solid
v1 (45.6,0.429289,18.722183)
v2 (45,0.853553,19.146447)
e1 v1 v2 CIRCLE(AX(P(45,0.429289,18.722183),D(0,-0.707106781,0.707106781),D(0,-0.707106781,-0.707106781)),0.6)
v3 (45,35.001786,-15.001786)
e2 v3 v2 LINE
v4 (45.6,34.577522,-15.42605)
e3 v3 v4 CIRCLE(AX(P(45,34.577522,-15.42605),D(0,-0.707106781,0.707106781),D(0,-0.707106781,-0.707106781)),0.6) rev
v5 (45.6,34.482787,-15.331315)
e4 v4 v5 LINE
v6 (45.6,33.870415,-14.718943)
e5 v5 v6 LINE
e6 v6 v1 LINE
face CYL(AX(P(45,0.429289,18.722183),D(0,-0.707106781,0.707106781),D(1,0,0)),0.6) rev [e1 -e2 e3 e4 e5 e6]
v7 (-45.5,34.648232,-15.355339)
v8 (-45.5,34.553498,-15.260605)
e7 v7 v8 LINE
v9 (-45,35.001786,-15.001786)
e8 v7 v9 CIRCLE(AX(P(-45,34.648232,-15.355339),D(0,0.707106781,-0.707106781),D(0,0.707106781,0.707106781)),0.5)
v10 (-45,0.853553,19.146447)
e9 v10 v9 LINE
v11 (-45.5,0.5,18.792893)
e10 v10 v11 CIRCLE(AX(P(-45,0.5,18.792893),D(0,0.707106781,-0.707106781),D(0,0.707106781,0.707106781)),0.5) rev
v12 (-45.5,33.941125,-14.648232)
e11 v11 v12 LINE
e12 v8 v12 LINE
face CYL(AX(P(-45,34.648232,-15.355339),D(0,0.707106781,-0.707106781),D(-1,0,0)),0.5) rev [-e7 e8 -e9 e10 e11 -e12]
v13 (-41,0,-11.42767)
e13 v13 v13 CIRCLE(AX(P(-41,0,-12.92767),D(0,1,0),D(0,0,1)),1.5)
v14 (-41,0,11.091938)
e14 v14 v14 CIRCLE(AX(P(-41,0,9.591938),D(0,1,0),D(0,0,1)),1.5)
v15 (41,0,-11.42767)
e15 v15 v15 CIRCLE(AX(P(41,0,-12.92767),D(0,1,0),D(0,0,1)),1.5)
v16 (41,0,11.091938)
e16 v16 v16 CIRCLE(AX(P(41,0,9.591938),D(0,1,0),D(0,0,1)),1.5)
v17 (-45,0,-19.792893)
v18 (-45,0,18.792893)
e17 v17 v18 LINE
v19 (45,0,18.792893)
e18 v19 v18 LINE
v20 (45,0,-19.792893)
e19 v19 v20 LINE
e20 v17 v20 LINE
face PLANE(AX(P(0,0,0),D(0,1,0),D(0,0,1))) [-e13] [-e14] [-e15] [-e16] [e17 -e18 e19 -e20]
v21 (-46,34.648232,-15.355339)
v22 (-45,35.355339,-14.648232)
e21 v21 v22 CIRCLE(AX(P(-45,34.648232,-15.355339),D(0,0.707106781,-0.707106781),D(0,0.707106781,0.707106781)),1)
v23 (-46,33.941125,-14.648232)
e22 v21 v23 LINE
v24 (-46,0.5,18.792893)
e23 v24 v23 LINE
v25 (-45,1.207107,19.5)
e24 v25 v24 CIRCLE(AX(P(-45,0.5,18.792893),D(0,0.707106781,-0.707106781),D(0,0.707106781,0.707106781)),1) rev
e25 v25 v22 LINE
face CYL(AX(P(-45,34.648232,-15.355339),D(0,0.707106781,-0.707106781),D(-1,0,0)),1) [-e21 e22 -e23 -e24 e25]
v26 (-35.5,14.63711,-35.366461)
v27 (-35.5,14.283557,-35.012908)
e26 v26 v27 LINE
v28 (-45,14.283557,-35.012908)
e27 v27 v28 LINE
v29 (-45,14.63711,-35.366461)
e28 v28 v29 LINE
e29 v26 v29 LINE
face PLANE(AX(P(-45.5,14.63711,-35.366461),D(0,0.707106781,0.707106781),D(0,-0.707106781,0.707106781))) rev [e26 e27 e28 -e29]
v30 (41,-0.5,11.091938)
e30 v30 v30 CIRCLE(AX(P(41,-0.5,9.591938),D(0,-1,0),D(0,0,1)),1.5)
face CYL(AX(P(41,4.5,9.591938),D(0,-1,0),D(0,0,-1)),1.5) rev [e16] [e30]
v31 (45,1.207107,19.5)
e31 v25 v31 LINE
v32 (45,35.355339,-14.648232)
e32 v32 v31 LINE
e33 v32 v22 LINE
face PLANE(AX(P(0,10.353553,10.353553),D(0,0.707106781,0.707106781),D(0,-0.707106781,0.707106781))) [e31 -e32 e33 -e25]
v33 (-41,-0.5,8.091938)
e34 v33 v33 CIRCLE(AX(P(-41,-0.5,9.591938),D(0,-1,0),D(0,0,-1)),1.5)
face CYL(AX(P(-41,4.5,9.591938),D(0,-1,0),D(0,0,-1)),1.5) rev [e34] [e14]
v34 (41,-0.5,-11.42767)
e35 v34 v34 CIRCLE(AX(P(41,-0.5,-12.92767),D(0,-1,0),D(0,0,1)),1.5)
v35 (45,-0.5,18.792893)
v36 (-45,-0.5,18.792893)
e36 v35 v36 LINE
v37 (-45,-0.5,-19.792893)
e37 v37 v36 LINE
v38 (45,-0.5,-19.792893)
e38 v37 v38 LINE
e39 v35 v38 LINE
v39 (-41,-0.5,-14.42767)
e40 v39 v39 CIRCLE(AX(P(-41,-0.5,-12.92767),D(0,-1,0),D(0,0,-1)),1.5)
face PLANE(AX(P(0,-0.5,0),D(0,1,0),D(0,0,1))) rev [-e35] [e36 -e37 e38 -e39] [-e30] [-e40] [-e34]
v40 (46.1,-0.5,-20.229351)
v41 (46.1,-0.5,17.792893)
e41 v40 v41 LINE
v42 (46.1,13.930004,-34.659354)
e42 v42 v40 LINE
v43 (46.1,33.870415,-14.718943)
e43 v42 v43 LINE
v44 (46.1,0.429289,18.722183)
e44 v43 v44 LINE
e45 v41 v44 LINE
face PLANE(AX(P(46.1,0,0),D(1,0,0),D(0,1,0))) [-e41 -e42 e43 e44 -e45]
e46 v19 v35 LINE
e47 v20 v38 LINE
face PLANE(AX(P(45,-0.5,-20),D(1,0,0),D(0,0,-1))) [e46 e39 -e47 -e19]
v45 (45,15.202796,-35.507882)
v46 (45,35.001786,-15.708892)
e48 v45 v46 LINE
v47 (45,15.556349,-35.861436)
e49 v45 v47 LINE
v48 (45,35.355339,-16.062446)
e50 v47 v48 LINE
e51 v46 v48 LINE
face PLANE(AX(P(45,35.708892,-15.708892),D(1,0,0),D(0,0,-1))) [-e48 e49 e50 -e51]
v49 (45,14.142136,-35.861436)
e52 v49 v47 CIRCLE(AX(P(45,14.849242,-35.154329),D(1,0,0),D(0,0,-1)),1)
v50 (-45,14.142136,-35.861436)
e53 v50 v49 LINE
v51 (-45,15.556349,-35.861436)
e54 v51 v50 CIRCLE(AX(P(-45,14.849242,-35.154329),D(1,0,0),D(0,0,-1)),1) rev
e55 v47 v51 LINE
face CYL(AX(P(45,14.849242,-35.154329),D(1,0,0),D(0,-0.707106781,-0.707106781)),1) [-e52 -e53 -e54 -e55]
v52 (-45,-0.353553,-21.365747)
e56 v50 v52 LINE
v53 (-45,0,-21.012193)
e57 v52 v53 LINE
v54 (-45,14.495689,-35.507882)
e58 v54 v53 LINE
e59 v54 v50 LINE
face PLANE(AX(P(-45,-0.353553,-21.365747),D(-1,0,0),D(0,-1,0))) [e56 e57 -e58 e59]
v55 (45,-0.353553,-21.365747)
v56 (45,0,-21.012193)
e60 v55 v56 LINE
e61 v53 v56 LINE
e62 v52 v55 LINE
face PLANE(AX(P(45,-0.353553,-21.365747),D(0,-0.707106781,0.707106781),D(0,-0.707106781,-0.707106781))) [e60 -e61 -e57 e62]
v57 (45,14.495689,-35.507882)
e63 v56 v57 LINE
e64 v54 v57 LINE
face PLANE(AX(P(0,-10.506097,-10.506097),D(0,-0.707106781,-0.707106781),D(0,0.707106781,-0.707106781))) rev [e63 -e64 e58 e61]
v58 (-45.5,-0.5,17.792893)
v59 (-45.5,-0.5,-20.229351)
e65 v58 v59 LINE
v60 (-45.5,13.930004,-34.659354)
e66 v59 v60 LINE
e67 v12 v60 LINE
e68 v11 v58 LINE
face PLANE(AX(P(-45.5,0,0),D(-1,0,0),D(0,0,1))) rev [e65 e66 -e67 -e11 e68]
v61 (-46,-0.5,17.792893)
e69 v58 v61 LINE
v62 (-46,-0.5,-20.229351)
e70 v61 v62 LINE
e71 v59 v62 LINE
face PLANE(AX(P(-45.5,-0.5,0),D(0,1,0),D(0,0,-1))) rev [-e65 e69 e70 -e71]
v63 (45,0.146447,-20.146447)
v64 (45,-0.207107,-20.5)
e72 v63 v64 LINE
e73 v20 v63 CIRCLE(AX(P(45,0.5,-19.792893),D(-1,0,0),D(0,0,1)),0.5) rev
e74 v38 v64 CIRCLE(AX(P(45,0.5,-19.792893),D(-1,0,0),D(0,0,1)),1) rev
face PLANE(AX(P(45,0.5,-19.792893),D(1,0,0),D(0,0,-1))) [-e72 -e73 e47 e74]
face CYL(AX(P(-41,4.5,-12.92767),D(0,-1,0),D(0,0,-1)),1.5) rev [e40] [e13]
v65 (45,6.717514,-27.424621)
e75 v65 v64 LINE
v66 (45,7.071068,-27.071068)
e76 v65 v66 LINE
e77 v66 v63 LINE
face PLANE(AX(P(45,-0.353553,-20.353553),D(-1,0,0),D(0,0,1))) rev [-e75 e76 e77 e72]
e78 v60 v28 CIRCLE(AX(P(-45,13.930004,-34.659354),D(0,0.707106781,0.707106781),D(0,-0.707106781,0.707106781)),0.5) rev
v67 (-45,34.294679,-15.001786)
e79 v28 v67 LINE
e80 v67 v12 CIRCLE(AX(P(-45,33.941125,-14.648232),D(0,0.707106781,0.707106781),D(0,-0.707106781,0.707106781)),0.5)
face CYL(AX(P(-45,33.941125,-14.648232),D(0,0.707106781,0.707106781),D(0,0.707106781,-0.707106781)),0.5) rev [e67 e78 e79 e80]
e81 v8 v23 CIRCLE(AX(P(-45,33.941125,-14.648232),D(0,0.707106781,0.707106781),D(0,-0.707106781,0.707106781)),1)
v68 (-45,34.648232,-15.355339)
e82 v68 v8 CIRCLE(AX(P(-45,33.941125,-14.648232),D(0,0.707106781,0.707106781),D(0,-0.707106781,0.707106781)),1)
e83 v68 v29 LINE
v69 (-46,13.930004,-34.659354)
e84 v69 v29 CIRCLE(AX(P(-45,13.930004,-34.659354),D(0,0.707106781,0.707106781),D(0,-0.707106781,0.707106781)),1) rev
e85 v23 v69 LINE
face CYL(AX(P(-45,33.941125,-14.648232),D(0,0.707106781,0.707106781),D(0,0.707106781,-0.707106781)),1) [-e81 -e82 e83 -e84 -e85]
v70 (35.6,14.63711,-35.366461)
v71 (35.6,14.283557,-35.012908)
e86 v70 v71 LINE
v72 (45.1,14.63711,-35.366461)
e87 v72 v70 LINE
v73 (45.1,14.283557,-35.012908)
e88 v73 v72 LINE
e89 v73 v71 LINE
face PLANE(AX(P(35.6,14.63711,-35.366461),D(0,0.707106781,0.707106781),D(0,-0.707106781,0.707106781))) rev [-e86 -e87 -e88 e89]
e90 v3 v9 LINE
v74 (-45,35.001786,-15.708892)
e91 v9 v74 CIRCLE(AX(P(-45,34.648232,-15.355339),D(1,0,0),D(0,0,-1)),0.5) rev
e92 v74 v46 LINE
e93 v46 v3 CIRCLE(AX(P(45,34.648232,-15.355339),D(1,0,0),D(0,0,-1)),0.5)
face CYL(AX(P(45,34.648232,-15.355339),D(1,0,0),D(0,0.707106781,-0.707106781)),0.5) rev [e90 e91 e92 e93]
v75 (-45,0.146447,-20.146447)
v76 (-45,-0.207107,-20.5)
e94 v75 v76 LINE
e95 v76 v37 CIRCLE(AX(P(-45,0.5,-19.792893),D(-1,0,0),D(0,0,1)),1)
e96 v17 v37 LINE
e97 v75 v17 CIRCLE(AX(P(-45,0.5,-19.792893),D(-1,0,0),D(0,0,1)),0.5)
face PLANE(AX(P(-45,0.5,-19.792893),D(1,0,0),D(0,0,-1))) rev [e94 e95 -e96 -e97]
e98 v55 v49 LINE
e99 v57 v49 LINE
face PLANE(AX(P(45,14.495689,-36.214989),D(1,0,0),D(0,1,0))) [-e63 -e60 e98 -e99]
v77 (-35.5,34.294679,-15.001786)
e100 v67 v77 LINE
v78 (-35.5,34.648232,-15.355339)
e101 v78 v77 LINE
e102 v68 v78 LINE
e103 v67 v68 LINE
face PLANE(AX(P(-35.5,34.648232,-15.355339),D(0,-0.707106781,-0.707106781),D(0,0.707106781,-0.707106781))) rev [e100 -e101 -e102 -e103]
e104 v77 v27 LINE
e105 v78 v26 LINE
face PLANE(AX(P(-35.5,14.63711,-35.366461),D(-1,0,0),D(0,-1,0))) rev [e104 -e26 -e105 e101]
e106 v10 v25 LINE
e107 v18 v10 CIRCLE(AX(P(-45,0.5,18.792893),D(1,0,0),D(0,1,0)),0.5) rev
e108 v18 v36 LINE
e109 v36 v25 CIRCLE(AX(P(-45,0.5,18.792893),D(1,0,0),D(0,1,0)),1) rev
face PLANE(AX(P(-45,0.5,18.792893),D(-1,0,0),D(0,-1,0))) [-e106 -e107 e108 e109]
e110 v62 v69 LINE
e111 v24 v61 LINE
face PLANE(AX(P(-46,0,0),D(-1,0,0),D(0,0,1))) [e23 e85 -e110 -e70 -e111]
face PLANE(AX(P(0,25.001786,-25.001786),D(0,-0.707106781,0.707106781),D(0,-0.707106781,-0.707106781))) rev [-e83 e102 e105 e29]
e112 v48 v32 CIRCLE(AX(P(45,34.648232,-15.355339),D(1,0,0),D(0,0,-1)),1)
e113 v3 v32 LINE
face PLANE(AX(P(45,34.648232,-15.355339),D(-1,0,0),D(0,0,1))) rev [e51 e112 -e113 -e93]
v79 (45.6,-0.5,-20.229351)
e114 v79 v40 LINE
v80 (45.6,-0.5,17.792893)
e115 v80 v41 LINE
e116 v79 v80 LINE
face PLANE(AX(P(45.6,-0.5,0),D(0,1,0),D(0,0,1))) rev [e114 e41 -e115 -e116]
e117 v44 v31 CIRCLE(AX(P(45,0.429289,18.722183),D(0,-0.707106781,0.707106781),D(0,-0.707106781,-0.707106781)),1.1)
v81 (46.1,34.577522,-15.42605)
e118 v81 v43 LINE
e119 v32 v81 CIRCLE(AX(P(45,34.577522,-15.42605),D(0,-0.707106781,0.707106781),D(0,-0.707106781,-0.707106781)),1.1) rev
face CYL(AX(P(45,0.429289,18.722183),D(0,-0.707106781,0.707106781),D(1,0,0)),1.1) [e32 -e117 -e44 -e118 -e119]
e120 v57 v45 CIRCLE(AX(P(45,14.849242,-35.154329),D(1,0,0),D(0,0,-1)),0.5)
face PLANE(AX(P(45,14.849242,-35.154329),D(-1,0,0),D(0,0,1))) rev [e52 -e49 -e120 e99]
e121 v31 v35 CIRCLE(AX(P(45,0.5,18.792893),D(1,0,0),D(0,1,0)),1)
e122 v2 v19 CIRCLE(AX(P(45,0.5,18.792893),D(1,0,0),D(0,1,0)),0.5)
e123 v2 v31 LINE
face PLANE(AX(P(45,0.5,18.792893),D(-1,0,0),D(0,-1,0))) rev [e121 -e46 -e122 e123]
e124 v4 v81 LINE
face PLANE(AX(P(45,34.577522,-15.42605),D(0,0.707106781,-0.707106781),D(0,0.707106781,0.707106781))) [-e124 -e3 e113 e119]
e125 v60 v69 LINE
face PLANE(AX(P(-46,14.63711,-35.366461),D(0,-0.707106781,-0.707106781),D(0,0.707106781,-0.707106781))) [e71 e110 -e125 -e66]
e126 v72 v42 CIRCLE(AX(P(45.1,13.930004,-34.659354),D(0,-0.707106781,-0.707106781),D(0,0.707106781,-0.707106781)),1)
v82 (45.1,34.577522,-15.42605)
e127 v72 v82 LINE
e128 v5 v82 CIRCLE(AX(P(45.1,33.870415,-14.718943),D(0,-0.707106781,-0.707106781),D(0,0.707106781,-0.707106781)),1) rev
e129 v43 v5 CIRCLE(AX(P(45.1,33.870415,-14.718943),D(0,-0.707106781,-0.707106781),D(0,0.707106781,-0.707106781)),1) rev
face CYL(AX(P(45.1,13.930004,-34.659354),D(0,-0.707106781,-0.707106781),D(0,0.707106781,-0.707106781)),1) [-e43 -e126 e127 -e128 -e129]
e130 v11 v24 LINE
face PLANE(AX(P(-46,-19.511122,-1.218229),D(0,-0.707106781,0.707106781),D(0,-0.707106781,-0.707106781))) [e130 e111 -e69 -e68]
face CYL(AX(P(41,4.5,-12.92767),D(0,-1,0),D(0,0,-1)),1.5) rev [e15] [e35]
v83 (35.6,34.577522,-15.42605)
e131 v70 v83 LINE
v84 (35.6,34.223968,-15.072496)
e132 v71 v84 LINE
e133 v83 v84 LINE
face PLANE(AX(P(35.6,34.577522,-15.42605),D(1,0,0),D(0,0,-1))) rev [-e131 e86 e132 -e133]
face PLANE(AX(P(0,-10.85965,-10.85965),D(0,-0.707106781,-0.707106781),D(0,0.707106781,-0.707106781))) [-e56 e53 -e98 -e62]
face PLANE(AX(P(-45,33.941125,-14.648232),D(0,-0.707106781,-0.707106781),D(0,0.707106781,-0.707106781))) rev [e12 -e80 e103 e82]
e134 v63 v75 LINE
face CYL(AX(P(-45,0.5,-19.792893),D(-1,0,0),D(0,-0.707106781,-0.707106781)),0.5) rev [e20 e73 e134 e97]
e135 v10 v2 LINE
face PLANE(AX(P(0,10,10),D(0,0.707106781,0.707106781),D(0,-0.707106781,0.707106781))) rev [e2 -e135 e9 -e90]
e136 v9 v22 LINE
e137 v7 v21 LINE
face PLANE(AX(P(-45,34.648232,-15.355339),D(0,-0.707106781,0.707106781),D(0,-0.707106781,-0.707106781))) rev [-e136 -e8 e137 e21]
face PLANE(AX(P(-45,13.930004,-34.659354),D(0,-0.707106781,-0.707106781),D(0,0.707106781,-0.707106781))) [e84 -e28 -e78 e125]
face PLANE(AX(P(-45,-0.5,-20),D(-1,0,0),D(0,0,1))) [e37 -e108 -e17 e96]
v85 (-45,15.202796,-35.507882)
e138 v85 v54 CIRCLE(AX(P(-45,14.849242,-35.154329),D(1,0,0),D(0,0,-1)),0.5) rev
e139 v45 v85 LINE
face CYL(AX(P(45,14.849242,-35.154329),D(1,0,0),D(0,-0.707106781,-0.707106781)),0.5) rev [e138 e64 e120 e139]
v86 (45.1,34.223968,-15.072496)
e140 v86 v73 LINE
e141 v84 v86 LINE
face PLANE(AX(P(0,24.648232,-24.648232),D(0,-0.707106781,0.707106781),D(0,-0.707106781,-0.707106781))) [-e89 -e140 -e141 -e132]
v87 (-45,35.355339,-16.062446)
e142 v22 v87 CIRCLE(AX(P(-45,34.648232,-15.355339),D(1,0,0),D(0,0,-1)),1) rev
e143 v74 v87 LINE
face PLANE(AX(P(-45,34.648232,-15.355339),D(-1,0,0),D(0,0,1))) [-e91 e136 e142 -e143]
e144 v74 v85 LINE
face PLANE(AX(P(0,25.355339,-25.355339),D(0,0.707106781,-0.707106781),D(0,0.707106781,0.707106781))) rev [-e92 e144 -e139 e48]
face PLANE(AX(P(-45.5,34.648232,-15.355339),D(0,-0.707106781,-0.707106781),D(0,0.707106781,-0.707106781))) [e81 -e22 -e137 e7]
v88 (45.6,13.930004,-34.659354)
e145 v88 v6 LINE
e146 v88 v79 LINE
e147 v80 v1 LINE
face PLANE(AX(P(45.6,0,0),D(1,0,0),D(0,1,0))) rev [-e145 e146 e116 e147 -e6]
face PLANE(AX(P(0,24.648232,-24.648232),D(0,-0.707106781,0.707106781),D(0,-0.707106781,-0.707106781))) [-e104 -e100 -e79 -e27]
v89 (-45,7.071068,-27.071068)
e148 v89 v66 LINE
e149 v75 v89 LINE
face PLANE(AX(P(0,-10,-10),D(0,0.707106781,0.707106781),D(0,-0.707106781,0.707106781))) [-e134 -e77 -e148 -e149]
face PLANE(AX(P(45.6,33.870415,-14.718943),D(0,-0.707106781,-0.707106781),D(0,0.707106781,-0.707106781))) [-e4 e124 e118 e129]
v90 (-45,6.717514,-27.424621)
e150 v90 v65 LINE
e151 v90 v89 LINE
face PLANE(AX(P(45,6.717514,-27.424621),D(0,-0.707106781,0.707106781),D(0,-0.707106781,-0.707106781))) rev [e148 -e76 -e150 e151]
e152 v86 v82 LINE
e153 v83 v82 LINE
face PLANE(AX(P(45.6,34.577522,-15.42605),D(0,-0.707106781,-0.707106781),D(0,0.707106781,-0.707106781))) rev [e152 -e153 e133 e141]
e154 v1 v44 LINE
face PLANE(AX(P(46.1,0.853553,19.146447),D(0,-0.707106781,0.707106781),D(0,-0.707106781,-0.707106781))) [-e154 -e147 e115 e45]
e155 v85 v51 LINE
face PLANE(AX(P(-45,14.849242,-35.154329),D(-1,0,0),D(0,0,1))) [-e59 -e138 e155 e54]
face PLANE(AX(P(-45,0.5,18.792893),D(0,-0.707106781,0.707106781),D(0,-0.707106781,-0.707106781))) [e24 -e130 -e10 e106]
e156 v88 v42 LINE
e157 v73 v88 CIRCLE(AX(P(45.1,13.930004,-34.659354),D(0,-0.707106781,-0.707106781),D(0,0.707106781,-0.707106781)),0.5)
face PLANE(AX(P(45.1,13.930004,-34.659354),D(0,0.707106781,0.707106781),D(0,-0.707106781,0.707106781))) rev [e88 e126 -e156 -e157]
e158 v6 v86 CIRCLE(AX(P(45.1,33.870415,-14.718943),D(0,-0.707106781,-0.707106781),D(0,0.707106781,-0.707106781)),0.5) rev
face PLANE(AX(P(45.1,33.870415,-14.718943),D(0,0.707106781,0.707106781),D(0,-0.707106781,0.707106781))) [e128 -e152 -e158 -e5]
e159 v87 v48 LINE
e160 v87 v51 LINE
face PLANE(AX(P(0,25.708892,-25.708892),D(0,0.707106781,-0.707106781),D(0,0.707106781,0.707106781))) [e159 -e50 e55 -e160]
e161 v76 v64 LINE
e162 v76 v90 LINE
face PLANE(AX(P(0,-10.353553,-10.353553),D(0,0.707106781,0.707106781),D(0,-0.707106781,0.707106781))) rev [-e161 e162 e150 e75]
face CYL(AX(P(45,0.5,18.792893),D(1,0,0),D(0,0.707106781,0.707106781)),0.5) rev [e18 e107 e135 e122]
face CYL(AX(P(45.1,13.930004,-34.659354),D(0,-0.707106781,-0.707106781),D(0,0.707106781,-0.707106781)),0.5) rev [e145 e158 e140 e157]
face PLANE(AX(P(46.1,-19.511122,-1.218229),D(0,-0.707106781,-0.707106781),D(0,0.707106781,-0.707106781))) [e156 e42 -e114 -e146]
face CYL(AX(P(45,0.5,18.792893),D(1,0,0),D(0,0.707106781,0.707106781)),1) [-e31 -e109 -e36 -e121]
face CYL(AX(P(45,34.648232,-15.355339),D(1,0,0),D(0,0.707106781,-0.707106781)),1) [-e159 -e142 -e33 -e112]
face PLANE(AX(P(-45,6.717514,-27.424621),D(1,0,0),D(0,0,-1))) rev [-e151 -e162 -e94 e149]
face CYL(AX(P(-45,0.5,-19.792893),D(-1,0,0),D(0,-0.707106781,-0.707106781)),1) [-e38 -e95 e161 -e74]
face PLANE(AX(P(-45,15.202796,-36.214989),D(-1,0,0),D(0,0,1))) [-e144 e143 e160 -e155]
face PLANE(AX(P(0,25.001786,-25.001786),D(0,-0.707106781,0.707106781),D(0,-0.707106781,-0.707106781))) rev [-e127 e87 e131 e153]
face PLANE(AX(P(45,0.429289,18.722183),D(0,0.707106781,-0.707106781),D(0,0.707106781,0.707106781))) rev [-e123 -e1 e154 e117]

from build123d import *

# Parameters (mm, degrees)
SKETCH1_W                     = 90
SKETCH1_H                     = 40
BASE_FLANGE1_DEPTH            = 0.5
EDGE_FLANGE1_STRIP_CUT_DEPTH  = 90
EDGE_FLANGE1_DEPTH            = 90
EDGE_FLANGE3_STRIP_CUT_DEPTH  = 90
EDGE_FLANGE3_DEPTH            = 90
EDGE_FLANGE2_STRIP_W          = 3
EDGE_FLANGE2_STRIP_H          = 0.5
EDGE_FLANGE2_STRIP_CUT_DEPTH  = 90
EDGE_FLANGE2_DEPTH            = 90
EDGE_FLANGE5_STRIP_W          = 3
EDGE_FLANGE5_STRIP_H          = 0.5
EDGE_FLANGE5_STRIP_CUT_DEPTH  = 90
EDGE_FLANGE5_DEPTH            = 90
EDGE_FLANGE7_DEPTH            = 48.292893219
EDGE_FLANGE8_DEPTH            = 48.292893219
CUT_EXTRUDE3_DEPTH            = 106.168160415
EDGE_FLANGE9_STRIP_W          = 3
EDGE_FLANGE9_STRIP_H          = 0.5
EDGE_FLANGE9_STRIP_CUT_DEPTH  = 28.3
EDGE_FLANGE9_DEPTH            = 28.3
EDGE_FLANGE10_STRIP_W         = 3
EDGE_FLANGE10_STRIP_H         = 0.5
EDGE_FLANGE10_STRIP_CUT_DEPTH = 28.2
EDGE_FLANGE10_DEPTH           = 28.2
SKETCH65_R                    = 1.5
CUT_EXTRUDE4_DEPTH            = 5


# Sheet-metal steps are written as plain solids
with BuildPart() as part:
    # Sketch1 → Base-Flange1 (new body)
    with BuildSketch(Plane(origin=(0, 0, 0), x_dir=(1, 0, 0), z_dir=(0, 1, 0))):
        Rectangle(SKETCH1_W, SKETCH1_H)
    extrude(amount=-BASE_FLANGE1_DEPTH)

    # Edge-Flange1 strip (across the edge) → Edge-Flange1 strip cut (cut)
    with BuildSketch(Plane(origin=(-45, 0, 20), x_dir=(0, -0.7071067811865513, -0.7071067811865438), z_dir=(1, 0, 0))):
        Polygon((-3.914213562, -4.621320344), (1.207106781, 0.5), (0.853553391, 0.853553391), (-4.267766953, -4.267766953), align=None)
    extrude(amount=EDGE_FLANGE1_STRIP_CUT_DEPTH, mode=Mode.SUBTRACT)

    # Edge-Flange1 section (across the edge) → Edge-Flange1 (add)
    with BuildSketch(Plane(origin=(-45, 0, 20), x_dir=(0, -0.7071067811865513, -0.7071067811865438), z_dir=(1, 0, 0))):
        with BuildLine():
            Line((-0.5, 1.207106781), (-0.5, 50))
            Line((-0.5, 50), (0, 50))
            Line((0, 50), (0, 1.207106781))
            ThreePointArc((0, 1.207106781), (0.308658284, 0.745167015), (0.853553391, 0.853553391))
            Line((0.853553391, 0.853553391), (1.207106781, 0.5))
            ThreePointArc((1.207106781, 0.5), (0.117316568, 0.283227249), (-0.5, 1.207106781))
        make_face()
    extrude(amount=EDGE_FLANGE1_DEPTH)

    # Edge-Flange3 strip (across the edge) → Edge-Flange3 strip cut (cut)
    with BuildSketch(Plane(origin=(45, 0, -20), x_dir=(0, 0.7071067811865562, 0.7071067811865388), z_dir=(-1, 0, 0))):
        Polygon((-2.328427125, 1.621320344), (-0.207106781, -0.5), (0.146446609, -0.146446609), (-1.974873734, 1.974873734), align=None)
    extrude(amount=EDGE_FLANGE3_STRIP_CUT_DEPTH, mode=Mode.SUBTRACT)

    # Edge-Flange3 section (across the edge) → Edge-Flange3 (add)
    with BuildSketch(Plane(origin=(45, 0, -20), x_dir=(0, 0.7071067811865562, 0.7071067811865388), z_dir=(-1, 0, 0))):
        with BuildLine():
            Line((-0.5, 0.207106781), (-0.5, 10))
            Line((-0.5, 10), (0, 10))
            Line((0, 10), (0, 0.207106781))
            ThreePointArc((0, 0.207106781), (0.038060234, 0.015765065), (0.146446609, -0.146446609))
            Line((0.146446609, -0.146446609), (-0.207106781, -0.5))
            ThreePointArc((-0.207106781, -0.5), (-0.423879533, -0.175576651), (-0.5, 0.207106781))
        make_face()
    extrude(amount=EDGE_FLANGE3_DEPTH)

    # Edge-Flange2 strip (across the edge) → Edge-Flange2 strip cut (cut)
    with BuildSketch(Plane(origin=(-45, 35.355339059, -15.355339059), x_dir=(0, -0.7071067811865511, 0.7071067811865439), z_dir=(1, 0, 0))):
        with Locations((-1, -0.25)):
            Rectangle(EDGE_FLANGE2_STRIP_W, EDGE_FLANGE2_STRIP_H)
    extrude(amount=EDGE_FLANGE2_STRIP_CUT_DEPTH, mode=Mode.SUBTRACT)

    # Edge-Flange2 section (across the edge) → Edge-Flange2 (add)
    with BuildSketch(Plane(origin=(-45, 35.355339059, -15.355339059), x_dir=(0, -0.7071067811865511, 0.7071067811865439), z_dir=(1, 0, 0))):
        with BuildLine():
            Line((-0.5, 0.5), (-0.5, 29))
            Line((-0.5, 29), (0, 29))
            Line((0, 29), (0, 0.5))
            ThreePointArc((0, 0.5), (0.146446609, 0.146446609), (0.5, 0))
            Line((0.5, 0), (0.5, -0.5))
            ThreePointArc((0.5, -0.5), (-0.207106781, -0.207106781), (-0.5, 0.5))
        make_face()
    extrude(amount=EDGE_FLANGE2_DEPTH)

    # Edge-Flange5 strip (across the edge) → Edge-Flange5 strip cut (cut)
    with BuildSketch(Plane(origin=(-45, 14.849242405, -35.861435714), x_dir=(0, 0.7071067811865416, 0.7071067811865535), z_dir=(1, 0, 0))):
        with Locations((-1, -0.25)):
            Rectangle(EDGE_FLANGE5_STRIP_W, EDGE_FLANGE5_STRIP_H)
    extrude(amount=EDGE_FLANGE5_STRIP_CUT_DEPTH, mode=Mode.SUBTRACT)

    # Edge-Flange5 section (across the edge) → Edge-Flange5 (add)
    with BuildSketch(Plane(origin=(-45, 14.849242405, -35.861435714), x_dir=(0, 0.7071067811865416, 0.7071067811865535), z_dir=(1, 0, 0))):
        with BuildLine():
            Line((-0.5, 0.5), (-0.5, 21))
            Line((-0.5, 21), (0, 21))
            Line((0, 21), (0, 0.5))
            ThreePointArc((0, 0.5), (0.146446609, 0.146446609), (0.5, 0))
            Line((0.5, 0), (0.5, -0.5))
            ThreePointArc((0.5, -0.5), (-0.207106781, -0.207106781), (-0.5, 0.5))
        make_face()
    extrude(amount=EDGE_FLANGE5_DEPTH)

    # Edge-Flange7 section (across the edge) → Edge-Flange7 (add)
    with BuildSketch(Plane(origin=(-45.5, 0.853553391, 19.146446609), x_dir=(1, 0, 0), z_dir=(0, 0.707106781186544, -0.7071067811865512))):
        with BuildLine():
            Line((-0.5, 0.5), (-0.5, 28.8))
            Line((-0.5, 28.8), (0, 28.8))
            Line((0, 28.8), (0, 0.5))
            ThreePointArc((0, 0.5), (0.146446609, 0.146446609), (0.5, 0))
            Line((0.5, 0), (0.5, -0.5))
            ThreePointArc((0.5, -0.5), (-0.207106781, -0.207106781), (-0.5, 0.5))
        make_face()
    extrude(amount=EDGE_FLANGE7_DEPTH)

    # Edge-Flange8 section (across the edge) → Edge-Flange8 (add)
    with BuildSketch(Plane(origin=(45.6, 35.001785669, -15.001785669), x_dir=(-1, 0, 0), z_dir=(0, -0.7071067811865439, 0.7071067811865512))):
        with BuildLine():
            Line((-0.5, 0.6), (-0.5, 28.8))
            Line((-0.5, 28.8), (0, 28.8))
            Line((0, 28.8), (0, 0.6))
            ThreePointArc((0, 0.6), (0.175735931, 0.175735931), (0.6, 0))
            Line((0.6, 0), (0.6, -0.5))
            ThreePointArc((0.6, -0.5), (-0.177817459, -0.177817459), (-0.5, 0.6))
        make_face()
    extrude(amount=EDGE_FLANGE8_DEPTH)

    # Sketch52 → Cut-Extrude3 (cut, through all)
    with BuildSketch(Plane.ZY.offset(46)):
        Polygon((-20.229350596, -0.5), (17.792893219, -0.5), (-1.218228689, -19.511121908), align=None)
    extrude(amount=-CUT_EXTRUDE3_DEPTH, mode=Mode.SUBTRACT)

    # Edge-Flange9 strip (across the edge) → Edge-Flange9 strip cut (cut)
    with BuildSketch(Plane(origin=(-45.5, 14.637110371, -35.366460967), x_dir=(3.347797797820495e-15, -0.7071067811865438, 0.7071067811865515), z_dir=(0, 0.7071067811865515, 0.7071067811865438))):
        with Locations((-0.5, -0.25)):
            Rectangle(EDGE_FLANGE9_STRIP_W, EDGE_FLANGE9_STRIP_H)
    extrude(amount=EDGE_FLANGE9_STRIP_CUT_DEPTH, mode=Mode.SUBTRACT)

    # Edge-Flange9 section (across the edge) → Edge-Flange9 (add)
    with BuildSketch(Plane(origin=(-45.5, 14.637110371, -35.366460967), x_dir=(3.347797797820495e-15, -0.7071067811865438, 0.7071067811865515), z_dir=(0, 0.7071067811865515, 0.7071067811865438))):
        with BuildLine():
            Line((0, 0.5), (0, 10))
            Line((0, 10), (0.5, 10))
            Line((0.5, 10), (0.5, 0.5))
            ThreePointArc((0.5, 0.5), (0.646446609, 0.146446609), (1, 0))
            Line((1, 0), (1, -0.5))
            ThreePointArc((1, -0.5), (0.292893219, -0.207106781), (0, 0.5))
        make_face()
    extrude(amount=EDGE_FLANGE9_DEPTH)

    # Edge-Flange10 strip (across the edge) → Edge-Flange10 strip cut (cut)
    with BuildSketch(Plane(origin=(45.6, 34.5775216, -15.426049737), x_dir=(-3.491481338843137e-15, -0.7071067811865434, 0.7071067811865518), z_dir=(3.4448409452021724e-15, -0.7071067811865518, -0.7071067811865434))):
        with Locations((-0.5, -0.25)):
            Rectangle(EDGE_FLANGE10_STRIP_W, EDGE_FLANGE10_STRIP_H)
    extrude(amount=EDGE_FLANGE10_STRIP_CUT_DEPTH, mode=Mode.SUBTRACT)

    # Edge-Flange10 section (across the edge) → Edge-Flange10 (add)
    with BuildSketch(Plane(origin=(45.6, 34.5775216, -15.426049737), x_dir=(-3.491481338843137e-15, -0.7071067811865434, 0.7071067811865518), z_dir=(3.4448409452021724e-15, -0.7071067811865518, -0.7071067811865434))):
        with BuildLine():
            Line((0, 0.5), (0, 10))
            Line((0, 10), (0.5, 10))
            Line((0.5, 10), (0.5, 0.5))
            ThreePointArc((0.5, 0.5), (0.646446609, 0.146446609), (1, 0))
            Line((1, 0), (1, -0.5))
            ThreePointArc((1, -0.5), (0.292893219, -0.207106781), (0, 0.5))
        make_face()
    extrude(amount=EDGE_FLANGE10_DEPTH)

    # Sketch65 → Cut-Extrude4 (cut)
    with BuildSketch(Plane.XZ.offset(0.5)):
        with Locations(Location((-41, 9.591937881, 0), (0, 0, 270))):
            Circle(SKETCH65_R)
        with Locations(Location((41, 9.591937881, 0), (0, 0, 90))):
            Circle(SKETCH65_R)
        with Locations(Location((-41, -12.92766953, 0), (0, 0, 270))):
            Circle(SKETCH65_R)
        with Locations(Location((41, -12.92766953, 0), (0, 0, 90))):
            Circle(SKETCH65_R)
    extrude(amount=-CUT_EXTRUDE4_DEPTH, mode=Mode.SUBTRACT)


solid = part.part
